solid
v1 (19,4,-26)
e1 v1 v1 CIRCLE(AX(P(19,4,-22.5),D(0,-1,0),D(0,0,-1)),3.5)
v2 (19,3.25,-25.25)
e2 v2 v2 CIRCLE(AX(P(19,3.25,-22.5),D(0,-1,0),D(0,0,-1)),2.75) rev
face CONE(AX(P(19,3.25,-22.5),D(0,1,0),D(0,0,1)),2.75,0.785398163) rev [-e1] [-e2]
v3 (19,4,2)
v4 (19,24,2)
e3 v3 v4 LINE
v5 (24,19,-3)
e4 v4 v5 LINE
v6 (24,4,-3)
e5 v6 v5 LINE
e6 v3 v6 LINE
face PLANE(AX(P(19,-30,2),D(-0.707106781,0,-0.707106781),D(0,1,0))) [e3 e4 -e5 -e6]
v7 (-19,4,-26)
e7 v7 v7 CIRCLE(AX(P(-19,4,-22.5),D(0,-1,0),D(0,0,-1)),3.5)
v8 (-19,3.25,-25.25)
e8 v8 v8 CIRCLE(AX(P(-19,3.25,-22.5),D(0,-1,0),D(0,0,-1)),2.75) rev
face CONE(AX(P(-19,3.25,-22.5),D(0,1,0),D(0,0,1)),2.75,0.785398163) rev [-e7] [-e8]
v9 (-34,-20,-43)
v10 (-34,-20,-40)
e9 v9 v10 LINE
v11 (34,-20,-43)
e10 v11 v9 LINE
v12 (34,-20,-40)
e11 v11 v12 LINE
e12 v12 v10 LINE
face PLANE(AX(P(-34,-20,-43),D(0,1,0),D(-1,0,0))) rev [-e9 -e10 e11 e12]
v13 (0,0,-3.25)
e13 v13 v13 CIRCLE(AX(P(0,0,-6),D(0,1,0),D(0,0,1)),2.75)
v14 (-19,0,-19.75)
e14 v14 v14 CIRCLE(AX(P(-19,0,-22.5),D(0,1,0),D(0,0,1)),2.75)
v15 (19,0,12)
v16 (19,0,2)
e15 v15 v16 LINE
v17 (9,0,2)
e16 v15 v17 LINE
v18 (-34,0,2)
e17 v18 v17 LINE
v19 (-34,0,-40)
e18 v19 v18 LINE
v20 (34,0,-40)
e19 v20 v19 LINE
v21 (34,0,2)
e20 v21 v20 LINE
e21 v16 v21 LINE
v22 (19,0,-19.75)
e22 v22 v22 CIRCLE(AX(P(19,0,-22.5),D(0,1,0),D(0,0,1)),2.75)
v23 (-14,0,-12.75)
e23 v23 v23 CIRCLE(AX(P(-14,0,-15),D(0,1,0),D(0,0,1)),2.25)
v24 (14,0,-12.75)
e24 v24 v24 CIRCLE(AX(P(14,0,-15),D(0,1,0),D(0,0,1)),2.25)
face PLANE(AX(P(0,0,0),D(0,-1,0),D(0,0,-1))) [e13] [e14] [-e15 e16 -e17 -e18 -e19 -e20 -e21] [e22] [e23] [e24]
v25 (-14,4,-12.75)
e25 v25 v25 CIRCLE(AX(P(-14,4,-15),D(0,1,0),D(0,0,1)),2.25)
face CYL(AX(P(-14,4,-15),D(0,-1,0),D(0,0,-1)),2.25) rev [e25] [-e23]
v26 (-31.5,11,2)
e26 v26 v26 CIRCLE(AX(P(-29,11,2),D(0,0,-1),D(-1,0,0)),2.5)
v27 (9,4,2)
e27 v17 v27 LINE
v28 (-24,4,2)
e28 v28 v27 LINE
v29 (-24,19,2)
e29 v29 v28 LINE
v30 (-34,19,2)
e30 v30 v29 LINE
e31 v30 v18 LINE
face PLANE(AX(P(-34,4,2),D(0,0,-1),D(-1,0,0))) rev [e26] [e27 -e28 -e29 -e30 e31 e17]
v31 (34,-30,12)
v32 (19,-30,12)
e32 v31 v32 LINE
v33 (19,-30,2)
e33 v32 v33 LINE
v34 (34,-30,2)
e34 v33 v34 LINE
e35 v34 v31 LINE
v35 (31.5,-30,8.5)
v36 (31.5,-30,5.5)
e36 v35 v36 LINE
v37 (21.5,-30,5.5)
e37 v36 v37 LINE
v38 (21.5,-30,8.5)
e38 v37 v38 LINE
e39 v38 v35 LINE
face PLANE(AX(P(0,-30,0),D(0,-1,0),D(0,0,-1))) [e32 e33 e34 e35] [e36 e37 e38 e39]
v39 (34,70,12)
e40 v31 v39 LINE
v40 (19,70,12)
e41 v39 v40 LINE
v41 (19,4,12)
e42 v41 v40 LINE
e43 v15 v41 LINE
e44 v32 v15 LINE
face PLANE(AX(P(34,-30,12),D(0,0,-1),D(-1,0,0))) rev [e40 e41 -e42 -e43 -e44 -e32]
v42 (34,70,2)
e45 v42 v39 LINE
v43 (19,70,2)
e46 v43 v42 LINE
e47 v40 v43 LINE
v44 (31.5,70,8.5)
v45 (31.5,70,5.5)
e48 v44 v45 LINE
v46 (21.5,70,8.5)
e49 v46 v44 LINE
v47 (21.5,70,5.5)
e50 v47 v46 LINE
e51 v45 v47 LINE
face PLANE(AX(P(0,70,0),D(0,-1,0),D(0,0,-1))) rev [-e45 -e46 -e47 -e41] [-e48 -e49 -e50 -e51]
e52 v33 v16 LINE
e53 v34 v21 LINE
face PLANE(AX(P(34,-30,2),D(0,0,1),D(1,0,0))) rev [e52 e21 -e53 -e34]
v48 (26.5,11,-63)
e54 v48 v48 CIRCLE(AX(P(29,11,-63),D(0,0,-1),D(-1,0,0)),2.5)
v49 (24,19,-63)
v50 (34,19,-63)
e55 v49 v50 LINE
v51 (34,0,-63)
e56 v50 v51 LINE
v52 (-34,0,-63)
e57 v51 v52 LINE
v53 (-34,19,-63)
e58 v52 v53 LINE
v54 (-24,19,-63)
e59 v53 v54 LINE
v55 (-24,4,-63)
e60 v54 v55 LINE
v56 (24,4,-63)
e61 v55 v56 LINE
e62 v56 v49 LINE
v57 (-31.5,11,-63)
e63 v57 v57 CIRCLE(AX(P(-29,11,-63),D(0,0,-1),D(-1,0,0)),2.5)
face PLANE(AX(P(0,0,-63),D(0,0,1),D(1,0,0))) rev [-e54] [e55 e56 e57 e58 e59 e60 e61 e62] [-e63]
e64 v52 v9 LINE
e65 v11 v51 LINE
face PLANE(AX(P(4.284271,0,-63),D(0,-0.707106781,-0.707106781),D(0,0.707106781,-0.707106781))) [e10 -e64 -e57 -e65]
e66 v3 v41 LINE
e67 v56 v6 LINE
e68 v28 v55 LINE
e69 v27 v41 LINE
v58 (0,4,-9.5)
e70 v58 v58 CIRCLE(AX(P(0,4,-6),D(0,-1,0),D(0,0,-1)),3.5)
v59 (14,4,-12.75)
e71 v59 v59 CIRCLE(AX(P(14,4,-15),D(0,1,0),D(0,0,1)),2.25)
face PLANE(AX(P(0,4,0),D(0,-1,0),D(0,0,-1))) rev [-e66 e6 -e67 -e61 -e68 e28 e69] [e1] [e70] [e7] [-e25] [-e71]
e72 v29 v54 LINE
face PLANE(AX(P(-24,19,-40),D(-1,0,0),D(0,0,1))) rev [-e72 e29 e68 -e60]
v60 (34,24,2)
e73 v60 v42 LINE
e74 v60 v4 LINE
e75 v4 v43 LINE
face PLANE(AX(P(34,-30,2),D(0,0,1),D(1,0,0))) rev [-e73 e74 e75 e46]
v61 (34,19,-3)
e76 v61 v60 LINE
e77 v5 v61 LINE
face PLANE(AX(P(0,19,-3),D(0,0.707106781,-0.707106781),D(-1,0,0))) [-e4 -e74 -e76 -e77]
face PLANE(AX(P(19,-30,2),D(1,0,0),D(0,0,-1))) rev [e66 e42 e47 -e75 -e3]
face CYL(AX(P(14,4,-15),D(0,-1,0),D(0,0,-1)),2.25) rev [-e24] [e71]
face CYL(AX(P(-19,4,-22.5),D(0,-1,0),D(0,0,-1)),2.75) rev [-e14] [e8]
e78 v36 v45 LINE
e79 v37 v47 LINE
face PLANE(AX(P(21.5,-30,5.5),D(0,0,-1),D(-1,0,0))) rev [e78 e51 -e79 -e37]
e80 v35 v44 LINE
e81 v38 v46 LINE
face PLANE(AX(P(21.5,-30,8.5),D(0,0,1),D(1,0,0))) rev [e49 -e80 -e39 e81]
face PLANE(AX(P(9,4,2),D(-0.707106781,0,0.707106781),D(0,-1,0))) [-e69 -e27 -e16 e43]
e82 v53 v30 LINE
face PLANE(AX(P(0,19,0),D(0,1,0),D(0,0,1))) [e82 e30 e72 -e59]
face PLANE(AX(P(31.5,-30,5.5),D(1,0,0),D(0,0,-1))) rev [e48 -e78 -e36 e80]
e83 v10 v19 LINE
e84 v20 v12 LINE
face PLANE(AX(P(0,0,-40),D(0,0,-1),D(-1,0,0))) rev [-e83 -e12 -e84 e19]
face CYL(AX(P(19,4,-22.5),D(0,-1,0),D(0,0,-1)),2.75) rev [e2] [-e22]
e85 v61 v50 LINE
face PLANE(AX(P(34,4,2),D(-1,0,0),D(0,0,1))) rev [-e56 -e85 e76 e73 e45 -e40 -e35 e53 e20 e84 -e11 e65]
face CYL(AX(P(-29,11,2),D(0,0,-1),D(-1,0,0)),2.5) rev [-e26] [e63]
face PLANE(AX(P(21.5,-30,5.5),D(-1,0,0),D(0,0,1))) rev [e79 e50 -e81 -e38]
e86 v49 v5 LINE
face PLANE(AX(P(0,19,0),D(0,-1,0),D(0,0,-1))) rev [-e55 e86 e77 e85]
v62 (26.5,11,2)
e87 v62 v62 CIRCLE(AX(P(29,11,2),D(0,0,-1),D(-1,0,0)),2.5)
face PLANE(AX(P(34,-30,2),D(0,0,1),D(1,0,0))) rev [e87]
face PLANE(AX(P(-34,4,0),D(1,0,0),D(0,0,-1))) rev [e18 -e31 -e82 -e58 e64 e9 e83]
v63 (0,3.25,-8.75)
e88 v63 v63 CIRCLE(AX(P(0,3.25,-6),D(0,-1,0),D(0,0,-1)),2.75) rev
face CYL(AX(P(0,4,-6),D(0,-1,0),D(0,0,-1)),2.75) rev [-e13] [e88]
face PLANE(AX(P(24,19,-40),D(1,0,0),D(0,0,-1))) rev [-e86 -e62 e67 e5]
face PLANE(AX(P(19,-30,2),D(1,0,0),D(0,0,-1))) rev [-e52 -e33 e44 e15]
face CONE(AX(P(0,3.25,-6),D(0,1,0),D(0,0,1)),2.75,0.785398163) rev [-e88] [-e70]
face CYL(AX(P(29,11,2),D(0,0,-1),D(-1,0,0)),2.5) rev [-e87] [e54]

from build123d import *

# Parameters (mm, degrees)
SKETCH1_R                = 2.75
SKETCH1_R_2              = 2.25
BOSS_EXTRUDE1_DEPTH      = 4
SKETCH3_W                = 10
SKETCH3_H                = 42
BOSS_EXTRUDE3_DEPTH      = 15
SKETCH4_R                = 2.5
CUT_EXTRUDE1_DEPTH       = 58.280013966
CHAMFER1_SIZE            = 0.75
BOSS_EXTRUDE5_DEPTH      = 30
BOSS_EXTRUDE5_DEPTH_BACK = 70
SKETCH8_W                = 15
SKETCH8_H                = 10
SKETCH10_W               = 10
SKETCH10_H               = 3
CUT_EXTRUDE4_DEPTH       = 113.942463228
BOSS_EXTRUDE6_START      = 23
SKETCH11_W               = 10
SKETCH11_H               = 19
SKETCH11_R               = 2.5
BOSS_EXTRUDE6_DEPTH      = 23
BOSS_EXTRUDE7_DEPTH      = 3
BOSS_EXTRUDE8_DEPTH      = 10
BOSS_EXTRUDE9_DEPTH      = 10
CHAMFER2_SIZE            = 5
CHAMFER3_SIZE            = 10
CHAMFER4_SIZE            = 5
BOSS_EXTRUDE10_REACH     = 112.603


with BuildPart() as part:
    # Sketch1 → Boss-Extrude1 (new body)
    with BuildSketch(Plane(origin=(0, 0, 0), x_dir=(1, 0, 0), z_dir=(0, 1, 0))):
        Polygon((-34, 0), (-34, 40), (34, 40), (34, 0), (34, -2), (-34, -2), align=None)
        with Locations(Location((-19, 22.5, 0), (0, 0, 270))):
            Circle(SKETCH1_R, mode=Mode.SUBTRACT)
        with Locations(Location((19, 22.5, 0), (0, 0, 270))):
            Circle(SKETCH1_R, mode=Mode.SUBTRACT)
        with Locations(Location((-14, 15, 0), (0, 0, 270))):
            Circle(SKETCH1_R_2, mode=Mode.SUBTRACT)
        with Locations(Location((14, 15, 0), (0, 0, 270))):
            Circle(SKETCH1_R_2, mode=Mode.SUBTRACT)
        with Locations(Location((0, 6, 0), (0, 0, 270))):
            Circle(SKETCH1_R, mode=Mode.SUBTRACT)
    extrude(amount=BOSS_EXTRUDE1_DEPTH)

    # Sketch3 → Boss-Extrude3 (add)
    with BuildSketch(Plane(origin=(0, 4, 0), x_dir=(1, 0, 0), z_dir=(0, 1, 0))):
        with Locations((-29, 19)):
            Rectangle(SKETCH3_W, SKETCH3_H)
        with Locations((29, 19)):
            Rectangle(SKETCH3_W, SKETCH3_H)
    extrude(amount=BOSS_EXTRUDE3_DEPTH)

    # Sketch4 → Cut-Extrude1 (cut, through all)
    with BuildSketch(Plane(origin=(0, 0, -40), x_dir=(-1, 0, 0), z_dir=(0, 0, -1))):
        with Locations((-29, 11)):
            Circle(SKETCH4_R)
        with Locations((29, 11)):
            Circle(SKETCH4_R)
    extrude(amount=-CUT_EXTRUDE1_DEPTH, mode=Mode.SUBTRACT)

    # Chamfer1
    chamfer1_edges = [part.edges().sort_by_distance(p)[0] for p in [
        (-19, 4, -25.25),
        (19, 4, -25.25),
        (0, 4, -8.75),
    ]]
    chamfer(chamfer1_edges, length=CHAMFER1_SIZE)

    # Sketch8 → Boss-Extrude5 (add, two sides: drawn at the far end of the back side and taken through both)
    with BuildSketch(Plane.XZ.offset(-BOSS_EXTRUDE5_DEPTH_BACK)):
        with Locations((26.5, 7)):
            Rectangle(SKETCH8_W, SKETCH8_H)
    extrude(amount=BOSS_EXTRUDE5_DEPTH + BOSS_EXTRUDE5_DEPTH_BACK)

    # Sketch10 → Cut-Extrude4 (cut, through all)
    with BuildSketch(Plane(origin=(0, 70, 0), x_dir=(1, 0, 0), z_dir=(0, 1, 0))):
        with Locations((26.5, -7)):
            Rectangle(SKETCH10_W, SKETCH10_H)
    extrude(amount=-CUT_EXTRUDE4_DEPTH, mode=Mode.SUBTRACT)

    # Sketch11 → Boss-Extrude6 (add)
    # profile 1 of 2: a face of its own
    with BuildSketch(Plane(origin=(0, 0, -40), x_dir=(-1, 0, 0), z_dir=(0, 0, -1)).offset(BOSS_EXTRUDE6_START)):
        with Locations((-29, 9.5)):
            Rectangle(SKETCH11_W, SKETCH11_H)
        with Locations((-29, 11)):
            Circle(SKETCH11_R, mode=Mode.SUBTRACT)
    # profile 2 of 2: a face of its own
    with BuildSketch(Plane(origin=(0, 0, -40), x_dir=(-1, 0, 0), z_dir=(0, 0, -1)).offset(BOSS_EXTRUDE6_START)):
        with Locations((29, 9.5)):
            Rectangle(SKETCH11_W, SKETCH11_H)
        with Locations((29, 11)):
            Circle(SKETCH11_R, mode=Mode.SUBTRACT)
    extrude(amount=-BOSS_EXTRUDE6_DEPTH)

    # Sketch12 → Boss-Extrude7 (add)
    with BuildSketch(Plane(origin=(0, 0, -40), x_dir=(-1, 0, 0), z_dir=(0, 0, -1))):
        Polygon((-24, 0), (-24, 4), (24, 4), (24, 0), (34, 0), (34, -20), (-34, -20), (-34, 0), align=None)
    extrude(amount=BOSS_EXTRUDE7_DEPTH)

    # Sketch13 → Boss-Extrude8 (add)
    with BuildSketch(Plane.ZY.offset(34)):
        Polygon((-63, 0), (-43, -20), (-43, 0), align=None)
    extrude(amount=-BOSS_EXTRUDE8_DEPTH)

    # Sketch14 → Boss-Extrude9 (add)
    with BuildSketch(Plane(origin=(34, 0, 0), x_dir=(0, 0, -1), z_dir=(1, 0, 0))):
        Polygon((43, 0), (43, -20), (63, 0), align=None)
    extrude(amount=-BOSS_EXTRUDE9_DEPTH)

    # Chamfer2
    chamfer2_edges = [part.edges().sort_by_distance(p)[0] for p in [
        (24, 11.5, 2),
    ]]
    chamfer(chamfer2_edges, length=CHAMFER2_SIZE - 0.0001)  # a hair under: the kernel refuses the full size

    # Chamfer3
    chamfer3_edges = [part.edges().sort_by_distance(p)[0] for p in [
        (19, 2, 2),
    ]]
    chamfer(chamfer3_edges, length=CHAMFER3_SIZE - 0.0001)  # a hair under: the kernel refuses the full size

    # Chamfer4
    chamfer4_edges = [part.edges().sort_by_distance(p)[0] for p in [
        (26.50005, 19, 2),
    ]]
    chamfer(chamfer4_edges, length=CHAMFER4_SIZE)

    # Sketch15 → Boss-Extrude10 (add, up to next)
    with BuildSketch(Plane.ZY.offset(-24), mode=Mode.PRIVATE) as boss_extrude10_sk1:
        Polygon((-43, -20), (-43, 4), (-63, 4), (-63, 0), align=None)
    boss_extrude10_tool1 = extrude(boss_extrude10_sk1.sketch, amount=BOSS_EXTRUDE10_REACH, mode=Mode.PRIVATE) - part.part
    add(boss_extrude10_tool1.solids().sort_by_distance((24, -4.190476, -50.619048))[0])


solid = part.part
